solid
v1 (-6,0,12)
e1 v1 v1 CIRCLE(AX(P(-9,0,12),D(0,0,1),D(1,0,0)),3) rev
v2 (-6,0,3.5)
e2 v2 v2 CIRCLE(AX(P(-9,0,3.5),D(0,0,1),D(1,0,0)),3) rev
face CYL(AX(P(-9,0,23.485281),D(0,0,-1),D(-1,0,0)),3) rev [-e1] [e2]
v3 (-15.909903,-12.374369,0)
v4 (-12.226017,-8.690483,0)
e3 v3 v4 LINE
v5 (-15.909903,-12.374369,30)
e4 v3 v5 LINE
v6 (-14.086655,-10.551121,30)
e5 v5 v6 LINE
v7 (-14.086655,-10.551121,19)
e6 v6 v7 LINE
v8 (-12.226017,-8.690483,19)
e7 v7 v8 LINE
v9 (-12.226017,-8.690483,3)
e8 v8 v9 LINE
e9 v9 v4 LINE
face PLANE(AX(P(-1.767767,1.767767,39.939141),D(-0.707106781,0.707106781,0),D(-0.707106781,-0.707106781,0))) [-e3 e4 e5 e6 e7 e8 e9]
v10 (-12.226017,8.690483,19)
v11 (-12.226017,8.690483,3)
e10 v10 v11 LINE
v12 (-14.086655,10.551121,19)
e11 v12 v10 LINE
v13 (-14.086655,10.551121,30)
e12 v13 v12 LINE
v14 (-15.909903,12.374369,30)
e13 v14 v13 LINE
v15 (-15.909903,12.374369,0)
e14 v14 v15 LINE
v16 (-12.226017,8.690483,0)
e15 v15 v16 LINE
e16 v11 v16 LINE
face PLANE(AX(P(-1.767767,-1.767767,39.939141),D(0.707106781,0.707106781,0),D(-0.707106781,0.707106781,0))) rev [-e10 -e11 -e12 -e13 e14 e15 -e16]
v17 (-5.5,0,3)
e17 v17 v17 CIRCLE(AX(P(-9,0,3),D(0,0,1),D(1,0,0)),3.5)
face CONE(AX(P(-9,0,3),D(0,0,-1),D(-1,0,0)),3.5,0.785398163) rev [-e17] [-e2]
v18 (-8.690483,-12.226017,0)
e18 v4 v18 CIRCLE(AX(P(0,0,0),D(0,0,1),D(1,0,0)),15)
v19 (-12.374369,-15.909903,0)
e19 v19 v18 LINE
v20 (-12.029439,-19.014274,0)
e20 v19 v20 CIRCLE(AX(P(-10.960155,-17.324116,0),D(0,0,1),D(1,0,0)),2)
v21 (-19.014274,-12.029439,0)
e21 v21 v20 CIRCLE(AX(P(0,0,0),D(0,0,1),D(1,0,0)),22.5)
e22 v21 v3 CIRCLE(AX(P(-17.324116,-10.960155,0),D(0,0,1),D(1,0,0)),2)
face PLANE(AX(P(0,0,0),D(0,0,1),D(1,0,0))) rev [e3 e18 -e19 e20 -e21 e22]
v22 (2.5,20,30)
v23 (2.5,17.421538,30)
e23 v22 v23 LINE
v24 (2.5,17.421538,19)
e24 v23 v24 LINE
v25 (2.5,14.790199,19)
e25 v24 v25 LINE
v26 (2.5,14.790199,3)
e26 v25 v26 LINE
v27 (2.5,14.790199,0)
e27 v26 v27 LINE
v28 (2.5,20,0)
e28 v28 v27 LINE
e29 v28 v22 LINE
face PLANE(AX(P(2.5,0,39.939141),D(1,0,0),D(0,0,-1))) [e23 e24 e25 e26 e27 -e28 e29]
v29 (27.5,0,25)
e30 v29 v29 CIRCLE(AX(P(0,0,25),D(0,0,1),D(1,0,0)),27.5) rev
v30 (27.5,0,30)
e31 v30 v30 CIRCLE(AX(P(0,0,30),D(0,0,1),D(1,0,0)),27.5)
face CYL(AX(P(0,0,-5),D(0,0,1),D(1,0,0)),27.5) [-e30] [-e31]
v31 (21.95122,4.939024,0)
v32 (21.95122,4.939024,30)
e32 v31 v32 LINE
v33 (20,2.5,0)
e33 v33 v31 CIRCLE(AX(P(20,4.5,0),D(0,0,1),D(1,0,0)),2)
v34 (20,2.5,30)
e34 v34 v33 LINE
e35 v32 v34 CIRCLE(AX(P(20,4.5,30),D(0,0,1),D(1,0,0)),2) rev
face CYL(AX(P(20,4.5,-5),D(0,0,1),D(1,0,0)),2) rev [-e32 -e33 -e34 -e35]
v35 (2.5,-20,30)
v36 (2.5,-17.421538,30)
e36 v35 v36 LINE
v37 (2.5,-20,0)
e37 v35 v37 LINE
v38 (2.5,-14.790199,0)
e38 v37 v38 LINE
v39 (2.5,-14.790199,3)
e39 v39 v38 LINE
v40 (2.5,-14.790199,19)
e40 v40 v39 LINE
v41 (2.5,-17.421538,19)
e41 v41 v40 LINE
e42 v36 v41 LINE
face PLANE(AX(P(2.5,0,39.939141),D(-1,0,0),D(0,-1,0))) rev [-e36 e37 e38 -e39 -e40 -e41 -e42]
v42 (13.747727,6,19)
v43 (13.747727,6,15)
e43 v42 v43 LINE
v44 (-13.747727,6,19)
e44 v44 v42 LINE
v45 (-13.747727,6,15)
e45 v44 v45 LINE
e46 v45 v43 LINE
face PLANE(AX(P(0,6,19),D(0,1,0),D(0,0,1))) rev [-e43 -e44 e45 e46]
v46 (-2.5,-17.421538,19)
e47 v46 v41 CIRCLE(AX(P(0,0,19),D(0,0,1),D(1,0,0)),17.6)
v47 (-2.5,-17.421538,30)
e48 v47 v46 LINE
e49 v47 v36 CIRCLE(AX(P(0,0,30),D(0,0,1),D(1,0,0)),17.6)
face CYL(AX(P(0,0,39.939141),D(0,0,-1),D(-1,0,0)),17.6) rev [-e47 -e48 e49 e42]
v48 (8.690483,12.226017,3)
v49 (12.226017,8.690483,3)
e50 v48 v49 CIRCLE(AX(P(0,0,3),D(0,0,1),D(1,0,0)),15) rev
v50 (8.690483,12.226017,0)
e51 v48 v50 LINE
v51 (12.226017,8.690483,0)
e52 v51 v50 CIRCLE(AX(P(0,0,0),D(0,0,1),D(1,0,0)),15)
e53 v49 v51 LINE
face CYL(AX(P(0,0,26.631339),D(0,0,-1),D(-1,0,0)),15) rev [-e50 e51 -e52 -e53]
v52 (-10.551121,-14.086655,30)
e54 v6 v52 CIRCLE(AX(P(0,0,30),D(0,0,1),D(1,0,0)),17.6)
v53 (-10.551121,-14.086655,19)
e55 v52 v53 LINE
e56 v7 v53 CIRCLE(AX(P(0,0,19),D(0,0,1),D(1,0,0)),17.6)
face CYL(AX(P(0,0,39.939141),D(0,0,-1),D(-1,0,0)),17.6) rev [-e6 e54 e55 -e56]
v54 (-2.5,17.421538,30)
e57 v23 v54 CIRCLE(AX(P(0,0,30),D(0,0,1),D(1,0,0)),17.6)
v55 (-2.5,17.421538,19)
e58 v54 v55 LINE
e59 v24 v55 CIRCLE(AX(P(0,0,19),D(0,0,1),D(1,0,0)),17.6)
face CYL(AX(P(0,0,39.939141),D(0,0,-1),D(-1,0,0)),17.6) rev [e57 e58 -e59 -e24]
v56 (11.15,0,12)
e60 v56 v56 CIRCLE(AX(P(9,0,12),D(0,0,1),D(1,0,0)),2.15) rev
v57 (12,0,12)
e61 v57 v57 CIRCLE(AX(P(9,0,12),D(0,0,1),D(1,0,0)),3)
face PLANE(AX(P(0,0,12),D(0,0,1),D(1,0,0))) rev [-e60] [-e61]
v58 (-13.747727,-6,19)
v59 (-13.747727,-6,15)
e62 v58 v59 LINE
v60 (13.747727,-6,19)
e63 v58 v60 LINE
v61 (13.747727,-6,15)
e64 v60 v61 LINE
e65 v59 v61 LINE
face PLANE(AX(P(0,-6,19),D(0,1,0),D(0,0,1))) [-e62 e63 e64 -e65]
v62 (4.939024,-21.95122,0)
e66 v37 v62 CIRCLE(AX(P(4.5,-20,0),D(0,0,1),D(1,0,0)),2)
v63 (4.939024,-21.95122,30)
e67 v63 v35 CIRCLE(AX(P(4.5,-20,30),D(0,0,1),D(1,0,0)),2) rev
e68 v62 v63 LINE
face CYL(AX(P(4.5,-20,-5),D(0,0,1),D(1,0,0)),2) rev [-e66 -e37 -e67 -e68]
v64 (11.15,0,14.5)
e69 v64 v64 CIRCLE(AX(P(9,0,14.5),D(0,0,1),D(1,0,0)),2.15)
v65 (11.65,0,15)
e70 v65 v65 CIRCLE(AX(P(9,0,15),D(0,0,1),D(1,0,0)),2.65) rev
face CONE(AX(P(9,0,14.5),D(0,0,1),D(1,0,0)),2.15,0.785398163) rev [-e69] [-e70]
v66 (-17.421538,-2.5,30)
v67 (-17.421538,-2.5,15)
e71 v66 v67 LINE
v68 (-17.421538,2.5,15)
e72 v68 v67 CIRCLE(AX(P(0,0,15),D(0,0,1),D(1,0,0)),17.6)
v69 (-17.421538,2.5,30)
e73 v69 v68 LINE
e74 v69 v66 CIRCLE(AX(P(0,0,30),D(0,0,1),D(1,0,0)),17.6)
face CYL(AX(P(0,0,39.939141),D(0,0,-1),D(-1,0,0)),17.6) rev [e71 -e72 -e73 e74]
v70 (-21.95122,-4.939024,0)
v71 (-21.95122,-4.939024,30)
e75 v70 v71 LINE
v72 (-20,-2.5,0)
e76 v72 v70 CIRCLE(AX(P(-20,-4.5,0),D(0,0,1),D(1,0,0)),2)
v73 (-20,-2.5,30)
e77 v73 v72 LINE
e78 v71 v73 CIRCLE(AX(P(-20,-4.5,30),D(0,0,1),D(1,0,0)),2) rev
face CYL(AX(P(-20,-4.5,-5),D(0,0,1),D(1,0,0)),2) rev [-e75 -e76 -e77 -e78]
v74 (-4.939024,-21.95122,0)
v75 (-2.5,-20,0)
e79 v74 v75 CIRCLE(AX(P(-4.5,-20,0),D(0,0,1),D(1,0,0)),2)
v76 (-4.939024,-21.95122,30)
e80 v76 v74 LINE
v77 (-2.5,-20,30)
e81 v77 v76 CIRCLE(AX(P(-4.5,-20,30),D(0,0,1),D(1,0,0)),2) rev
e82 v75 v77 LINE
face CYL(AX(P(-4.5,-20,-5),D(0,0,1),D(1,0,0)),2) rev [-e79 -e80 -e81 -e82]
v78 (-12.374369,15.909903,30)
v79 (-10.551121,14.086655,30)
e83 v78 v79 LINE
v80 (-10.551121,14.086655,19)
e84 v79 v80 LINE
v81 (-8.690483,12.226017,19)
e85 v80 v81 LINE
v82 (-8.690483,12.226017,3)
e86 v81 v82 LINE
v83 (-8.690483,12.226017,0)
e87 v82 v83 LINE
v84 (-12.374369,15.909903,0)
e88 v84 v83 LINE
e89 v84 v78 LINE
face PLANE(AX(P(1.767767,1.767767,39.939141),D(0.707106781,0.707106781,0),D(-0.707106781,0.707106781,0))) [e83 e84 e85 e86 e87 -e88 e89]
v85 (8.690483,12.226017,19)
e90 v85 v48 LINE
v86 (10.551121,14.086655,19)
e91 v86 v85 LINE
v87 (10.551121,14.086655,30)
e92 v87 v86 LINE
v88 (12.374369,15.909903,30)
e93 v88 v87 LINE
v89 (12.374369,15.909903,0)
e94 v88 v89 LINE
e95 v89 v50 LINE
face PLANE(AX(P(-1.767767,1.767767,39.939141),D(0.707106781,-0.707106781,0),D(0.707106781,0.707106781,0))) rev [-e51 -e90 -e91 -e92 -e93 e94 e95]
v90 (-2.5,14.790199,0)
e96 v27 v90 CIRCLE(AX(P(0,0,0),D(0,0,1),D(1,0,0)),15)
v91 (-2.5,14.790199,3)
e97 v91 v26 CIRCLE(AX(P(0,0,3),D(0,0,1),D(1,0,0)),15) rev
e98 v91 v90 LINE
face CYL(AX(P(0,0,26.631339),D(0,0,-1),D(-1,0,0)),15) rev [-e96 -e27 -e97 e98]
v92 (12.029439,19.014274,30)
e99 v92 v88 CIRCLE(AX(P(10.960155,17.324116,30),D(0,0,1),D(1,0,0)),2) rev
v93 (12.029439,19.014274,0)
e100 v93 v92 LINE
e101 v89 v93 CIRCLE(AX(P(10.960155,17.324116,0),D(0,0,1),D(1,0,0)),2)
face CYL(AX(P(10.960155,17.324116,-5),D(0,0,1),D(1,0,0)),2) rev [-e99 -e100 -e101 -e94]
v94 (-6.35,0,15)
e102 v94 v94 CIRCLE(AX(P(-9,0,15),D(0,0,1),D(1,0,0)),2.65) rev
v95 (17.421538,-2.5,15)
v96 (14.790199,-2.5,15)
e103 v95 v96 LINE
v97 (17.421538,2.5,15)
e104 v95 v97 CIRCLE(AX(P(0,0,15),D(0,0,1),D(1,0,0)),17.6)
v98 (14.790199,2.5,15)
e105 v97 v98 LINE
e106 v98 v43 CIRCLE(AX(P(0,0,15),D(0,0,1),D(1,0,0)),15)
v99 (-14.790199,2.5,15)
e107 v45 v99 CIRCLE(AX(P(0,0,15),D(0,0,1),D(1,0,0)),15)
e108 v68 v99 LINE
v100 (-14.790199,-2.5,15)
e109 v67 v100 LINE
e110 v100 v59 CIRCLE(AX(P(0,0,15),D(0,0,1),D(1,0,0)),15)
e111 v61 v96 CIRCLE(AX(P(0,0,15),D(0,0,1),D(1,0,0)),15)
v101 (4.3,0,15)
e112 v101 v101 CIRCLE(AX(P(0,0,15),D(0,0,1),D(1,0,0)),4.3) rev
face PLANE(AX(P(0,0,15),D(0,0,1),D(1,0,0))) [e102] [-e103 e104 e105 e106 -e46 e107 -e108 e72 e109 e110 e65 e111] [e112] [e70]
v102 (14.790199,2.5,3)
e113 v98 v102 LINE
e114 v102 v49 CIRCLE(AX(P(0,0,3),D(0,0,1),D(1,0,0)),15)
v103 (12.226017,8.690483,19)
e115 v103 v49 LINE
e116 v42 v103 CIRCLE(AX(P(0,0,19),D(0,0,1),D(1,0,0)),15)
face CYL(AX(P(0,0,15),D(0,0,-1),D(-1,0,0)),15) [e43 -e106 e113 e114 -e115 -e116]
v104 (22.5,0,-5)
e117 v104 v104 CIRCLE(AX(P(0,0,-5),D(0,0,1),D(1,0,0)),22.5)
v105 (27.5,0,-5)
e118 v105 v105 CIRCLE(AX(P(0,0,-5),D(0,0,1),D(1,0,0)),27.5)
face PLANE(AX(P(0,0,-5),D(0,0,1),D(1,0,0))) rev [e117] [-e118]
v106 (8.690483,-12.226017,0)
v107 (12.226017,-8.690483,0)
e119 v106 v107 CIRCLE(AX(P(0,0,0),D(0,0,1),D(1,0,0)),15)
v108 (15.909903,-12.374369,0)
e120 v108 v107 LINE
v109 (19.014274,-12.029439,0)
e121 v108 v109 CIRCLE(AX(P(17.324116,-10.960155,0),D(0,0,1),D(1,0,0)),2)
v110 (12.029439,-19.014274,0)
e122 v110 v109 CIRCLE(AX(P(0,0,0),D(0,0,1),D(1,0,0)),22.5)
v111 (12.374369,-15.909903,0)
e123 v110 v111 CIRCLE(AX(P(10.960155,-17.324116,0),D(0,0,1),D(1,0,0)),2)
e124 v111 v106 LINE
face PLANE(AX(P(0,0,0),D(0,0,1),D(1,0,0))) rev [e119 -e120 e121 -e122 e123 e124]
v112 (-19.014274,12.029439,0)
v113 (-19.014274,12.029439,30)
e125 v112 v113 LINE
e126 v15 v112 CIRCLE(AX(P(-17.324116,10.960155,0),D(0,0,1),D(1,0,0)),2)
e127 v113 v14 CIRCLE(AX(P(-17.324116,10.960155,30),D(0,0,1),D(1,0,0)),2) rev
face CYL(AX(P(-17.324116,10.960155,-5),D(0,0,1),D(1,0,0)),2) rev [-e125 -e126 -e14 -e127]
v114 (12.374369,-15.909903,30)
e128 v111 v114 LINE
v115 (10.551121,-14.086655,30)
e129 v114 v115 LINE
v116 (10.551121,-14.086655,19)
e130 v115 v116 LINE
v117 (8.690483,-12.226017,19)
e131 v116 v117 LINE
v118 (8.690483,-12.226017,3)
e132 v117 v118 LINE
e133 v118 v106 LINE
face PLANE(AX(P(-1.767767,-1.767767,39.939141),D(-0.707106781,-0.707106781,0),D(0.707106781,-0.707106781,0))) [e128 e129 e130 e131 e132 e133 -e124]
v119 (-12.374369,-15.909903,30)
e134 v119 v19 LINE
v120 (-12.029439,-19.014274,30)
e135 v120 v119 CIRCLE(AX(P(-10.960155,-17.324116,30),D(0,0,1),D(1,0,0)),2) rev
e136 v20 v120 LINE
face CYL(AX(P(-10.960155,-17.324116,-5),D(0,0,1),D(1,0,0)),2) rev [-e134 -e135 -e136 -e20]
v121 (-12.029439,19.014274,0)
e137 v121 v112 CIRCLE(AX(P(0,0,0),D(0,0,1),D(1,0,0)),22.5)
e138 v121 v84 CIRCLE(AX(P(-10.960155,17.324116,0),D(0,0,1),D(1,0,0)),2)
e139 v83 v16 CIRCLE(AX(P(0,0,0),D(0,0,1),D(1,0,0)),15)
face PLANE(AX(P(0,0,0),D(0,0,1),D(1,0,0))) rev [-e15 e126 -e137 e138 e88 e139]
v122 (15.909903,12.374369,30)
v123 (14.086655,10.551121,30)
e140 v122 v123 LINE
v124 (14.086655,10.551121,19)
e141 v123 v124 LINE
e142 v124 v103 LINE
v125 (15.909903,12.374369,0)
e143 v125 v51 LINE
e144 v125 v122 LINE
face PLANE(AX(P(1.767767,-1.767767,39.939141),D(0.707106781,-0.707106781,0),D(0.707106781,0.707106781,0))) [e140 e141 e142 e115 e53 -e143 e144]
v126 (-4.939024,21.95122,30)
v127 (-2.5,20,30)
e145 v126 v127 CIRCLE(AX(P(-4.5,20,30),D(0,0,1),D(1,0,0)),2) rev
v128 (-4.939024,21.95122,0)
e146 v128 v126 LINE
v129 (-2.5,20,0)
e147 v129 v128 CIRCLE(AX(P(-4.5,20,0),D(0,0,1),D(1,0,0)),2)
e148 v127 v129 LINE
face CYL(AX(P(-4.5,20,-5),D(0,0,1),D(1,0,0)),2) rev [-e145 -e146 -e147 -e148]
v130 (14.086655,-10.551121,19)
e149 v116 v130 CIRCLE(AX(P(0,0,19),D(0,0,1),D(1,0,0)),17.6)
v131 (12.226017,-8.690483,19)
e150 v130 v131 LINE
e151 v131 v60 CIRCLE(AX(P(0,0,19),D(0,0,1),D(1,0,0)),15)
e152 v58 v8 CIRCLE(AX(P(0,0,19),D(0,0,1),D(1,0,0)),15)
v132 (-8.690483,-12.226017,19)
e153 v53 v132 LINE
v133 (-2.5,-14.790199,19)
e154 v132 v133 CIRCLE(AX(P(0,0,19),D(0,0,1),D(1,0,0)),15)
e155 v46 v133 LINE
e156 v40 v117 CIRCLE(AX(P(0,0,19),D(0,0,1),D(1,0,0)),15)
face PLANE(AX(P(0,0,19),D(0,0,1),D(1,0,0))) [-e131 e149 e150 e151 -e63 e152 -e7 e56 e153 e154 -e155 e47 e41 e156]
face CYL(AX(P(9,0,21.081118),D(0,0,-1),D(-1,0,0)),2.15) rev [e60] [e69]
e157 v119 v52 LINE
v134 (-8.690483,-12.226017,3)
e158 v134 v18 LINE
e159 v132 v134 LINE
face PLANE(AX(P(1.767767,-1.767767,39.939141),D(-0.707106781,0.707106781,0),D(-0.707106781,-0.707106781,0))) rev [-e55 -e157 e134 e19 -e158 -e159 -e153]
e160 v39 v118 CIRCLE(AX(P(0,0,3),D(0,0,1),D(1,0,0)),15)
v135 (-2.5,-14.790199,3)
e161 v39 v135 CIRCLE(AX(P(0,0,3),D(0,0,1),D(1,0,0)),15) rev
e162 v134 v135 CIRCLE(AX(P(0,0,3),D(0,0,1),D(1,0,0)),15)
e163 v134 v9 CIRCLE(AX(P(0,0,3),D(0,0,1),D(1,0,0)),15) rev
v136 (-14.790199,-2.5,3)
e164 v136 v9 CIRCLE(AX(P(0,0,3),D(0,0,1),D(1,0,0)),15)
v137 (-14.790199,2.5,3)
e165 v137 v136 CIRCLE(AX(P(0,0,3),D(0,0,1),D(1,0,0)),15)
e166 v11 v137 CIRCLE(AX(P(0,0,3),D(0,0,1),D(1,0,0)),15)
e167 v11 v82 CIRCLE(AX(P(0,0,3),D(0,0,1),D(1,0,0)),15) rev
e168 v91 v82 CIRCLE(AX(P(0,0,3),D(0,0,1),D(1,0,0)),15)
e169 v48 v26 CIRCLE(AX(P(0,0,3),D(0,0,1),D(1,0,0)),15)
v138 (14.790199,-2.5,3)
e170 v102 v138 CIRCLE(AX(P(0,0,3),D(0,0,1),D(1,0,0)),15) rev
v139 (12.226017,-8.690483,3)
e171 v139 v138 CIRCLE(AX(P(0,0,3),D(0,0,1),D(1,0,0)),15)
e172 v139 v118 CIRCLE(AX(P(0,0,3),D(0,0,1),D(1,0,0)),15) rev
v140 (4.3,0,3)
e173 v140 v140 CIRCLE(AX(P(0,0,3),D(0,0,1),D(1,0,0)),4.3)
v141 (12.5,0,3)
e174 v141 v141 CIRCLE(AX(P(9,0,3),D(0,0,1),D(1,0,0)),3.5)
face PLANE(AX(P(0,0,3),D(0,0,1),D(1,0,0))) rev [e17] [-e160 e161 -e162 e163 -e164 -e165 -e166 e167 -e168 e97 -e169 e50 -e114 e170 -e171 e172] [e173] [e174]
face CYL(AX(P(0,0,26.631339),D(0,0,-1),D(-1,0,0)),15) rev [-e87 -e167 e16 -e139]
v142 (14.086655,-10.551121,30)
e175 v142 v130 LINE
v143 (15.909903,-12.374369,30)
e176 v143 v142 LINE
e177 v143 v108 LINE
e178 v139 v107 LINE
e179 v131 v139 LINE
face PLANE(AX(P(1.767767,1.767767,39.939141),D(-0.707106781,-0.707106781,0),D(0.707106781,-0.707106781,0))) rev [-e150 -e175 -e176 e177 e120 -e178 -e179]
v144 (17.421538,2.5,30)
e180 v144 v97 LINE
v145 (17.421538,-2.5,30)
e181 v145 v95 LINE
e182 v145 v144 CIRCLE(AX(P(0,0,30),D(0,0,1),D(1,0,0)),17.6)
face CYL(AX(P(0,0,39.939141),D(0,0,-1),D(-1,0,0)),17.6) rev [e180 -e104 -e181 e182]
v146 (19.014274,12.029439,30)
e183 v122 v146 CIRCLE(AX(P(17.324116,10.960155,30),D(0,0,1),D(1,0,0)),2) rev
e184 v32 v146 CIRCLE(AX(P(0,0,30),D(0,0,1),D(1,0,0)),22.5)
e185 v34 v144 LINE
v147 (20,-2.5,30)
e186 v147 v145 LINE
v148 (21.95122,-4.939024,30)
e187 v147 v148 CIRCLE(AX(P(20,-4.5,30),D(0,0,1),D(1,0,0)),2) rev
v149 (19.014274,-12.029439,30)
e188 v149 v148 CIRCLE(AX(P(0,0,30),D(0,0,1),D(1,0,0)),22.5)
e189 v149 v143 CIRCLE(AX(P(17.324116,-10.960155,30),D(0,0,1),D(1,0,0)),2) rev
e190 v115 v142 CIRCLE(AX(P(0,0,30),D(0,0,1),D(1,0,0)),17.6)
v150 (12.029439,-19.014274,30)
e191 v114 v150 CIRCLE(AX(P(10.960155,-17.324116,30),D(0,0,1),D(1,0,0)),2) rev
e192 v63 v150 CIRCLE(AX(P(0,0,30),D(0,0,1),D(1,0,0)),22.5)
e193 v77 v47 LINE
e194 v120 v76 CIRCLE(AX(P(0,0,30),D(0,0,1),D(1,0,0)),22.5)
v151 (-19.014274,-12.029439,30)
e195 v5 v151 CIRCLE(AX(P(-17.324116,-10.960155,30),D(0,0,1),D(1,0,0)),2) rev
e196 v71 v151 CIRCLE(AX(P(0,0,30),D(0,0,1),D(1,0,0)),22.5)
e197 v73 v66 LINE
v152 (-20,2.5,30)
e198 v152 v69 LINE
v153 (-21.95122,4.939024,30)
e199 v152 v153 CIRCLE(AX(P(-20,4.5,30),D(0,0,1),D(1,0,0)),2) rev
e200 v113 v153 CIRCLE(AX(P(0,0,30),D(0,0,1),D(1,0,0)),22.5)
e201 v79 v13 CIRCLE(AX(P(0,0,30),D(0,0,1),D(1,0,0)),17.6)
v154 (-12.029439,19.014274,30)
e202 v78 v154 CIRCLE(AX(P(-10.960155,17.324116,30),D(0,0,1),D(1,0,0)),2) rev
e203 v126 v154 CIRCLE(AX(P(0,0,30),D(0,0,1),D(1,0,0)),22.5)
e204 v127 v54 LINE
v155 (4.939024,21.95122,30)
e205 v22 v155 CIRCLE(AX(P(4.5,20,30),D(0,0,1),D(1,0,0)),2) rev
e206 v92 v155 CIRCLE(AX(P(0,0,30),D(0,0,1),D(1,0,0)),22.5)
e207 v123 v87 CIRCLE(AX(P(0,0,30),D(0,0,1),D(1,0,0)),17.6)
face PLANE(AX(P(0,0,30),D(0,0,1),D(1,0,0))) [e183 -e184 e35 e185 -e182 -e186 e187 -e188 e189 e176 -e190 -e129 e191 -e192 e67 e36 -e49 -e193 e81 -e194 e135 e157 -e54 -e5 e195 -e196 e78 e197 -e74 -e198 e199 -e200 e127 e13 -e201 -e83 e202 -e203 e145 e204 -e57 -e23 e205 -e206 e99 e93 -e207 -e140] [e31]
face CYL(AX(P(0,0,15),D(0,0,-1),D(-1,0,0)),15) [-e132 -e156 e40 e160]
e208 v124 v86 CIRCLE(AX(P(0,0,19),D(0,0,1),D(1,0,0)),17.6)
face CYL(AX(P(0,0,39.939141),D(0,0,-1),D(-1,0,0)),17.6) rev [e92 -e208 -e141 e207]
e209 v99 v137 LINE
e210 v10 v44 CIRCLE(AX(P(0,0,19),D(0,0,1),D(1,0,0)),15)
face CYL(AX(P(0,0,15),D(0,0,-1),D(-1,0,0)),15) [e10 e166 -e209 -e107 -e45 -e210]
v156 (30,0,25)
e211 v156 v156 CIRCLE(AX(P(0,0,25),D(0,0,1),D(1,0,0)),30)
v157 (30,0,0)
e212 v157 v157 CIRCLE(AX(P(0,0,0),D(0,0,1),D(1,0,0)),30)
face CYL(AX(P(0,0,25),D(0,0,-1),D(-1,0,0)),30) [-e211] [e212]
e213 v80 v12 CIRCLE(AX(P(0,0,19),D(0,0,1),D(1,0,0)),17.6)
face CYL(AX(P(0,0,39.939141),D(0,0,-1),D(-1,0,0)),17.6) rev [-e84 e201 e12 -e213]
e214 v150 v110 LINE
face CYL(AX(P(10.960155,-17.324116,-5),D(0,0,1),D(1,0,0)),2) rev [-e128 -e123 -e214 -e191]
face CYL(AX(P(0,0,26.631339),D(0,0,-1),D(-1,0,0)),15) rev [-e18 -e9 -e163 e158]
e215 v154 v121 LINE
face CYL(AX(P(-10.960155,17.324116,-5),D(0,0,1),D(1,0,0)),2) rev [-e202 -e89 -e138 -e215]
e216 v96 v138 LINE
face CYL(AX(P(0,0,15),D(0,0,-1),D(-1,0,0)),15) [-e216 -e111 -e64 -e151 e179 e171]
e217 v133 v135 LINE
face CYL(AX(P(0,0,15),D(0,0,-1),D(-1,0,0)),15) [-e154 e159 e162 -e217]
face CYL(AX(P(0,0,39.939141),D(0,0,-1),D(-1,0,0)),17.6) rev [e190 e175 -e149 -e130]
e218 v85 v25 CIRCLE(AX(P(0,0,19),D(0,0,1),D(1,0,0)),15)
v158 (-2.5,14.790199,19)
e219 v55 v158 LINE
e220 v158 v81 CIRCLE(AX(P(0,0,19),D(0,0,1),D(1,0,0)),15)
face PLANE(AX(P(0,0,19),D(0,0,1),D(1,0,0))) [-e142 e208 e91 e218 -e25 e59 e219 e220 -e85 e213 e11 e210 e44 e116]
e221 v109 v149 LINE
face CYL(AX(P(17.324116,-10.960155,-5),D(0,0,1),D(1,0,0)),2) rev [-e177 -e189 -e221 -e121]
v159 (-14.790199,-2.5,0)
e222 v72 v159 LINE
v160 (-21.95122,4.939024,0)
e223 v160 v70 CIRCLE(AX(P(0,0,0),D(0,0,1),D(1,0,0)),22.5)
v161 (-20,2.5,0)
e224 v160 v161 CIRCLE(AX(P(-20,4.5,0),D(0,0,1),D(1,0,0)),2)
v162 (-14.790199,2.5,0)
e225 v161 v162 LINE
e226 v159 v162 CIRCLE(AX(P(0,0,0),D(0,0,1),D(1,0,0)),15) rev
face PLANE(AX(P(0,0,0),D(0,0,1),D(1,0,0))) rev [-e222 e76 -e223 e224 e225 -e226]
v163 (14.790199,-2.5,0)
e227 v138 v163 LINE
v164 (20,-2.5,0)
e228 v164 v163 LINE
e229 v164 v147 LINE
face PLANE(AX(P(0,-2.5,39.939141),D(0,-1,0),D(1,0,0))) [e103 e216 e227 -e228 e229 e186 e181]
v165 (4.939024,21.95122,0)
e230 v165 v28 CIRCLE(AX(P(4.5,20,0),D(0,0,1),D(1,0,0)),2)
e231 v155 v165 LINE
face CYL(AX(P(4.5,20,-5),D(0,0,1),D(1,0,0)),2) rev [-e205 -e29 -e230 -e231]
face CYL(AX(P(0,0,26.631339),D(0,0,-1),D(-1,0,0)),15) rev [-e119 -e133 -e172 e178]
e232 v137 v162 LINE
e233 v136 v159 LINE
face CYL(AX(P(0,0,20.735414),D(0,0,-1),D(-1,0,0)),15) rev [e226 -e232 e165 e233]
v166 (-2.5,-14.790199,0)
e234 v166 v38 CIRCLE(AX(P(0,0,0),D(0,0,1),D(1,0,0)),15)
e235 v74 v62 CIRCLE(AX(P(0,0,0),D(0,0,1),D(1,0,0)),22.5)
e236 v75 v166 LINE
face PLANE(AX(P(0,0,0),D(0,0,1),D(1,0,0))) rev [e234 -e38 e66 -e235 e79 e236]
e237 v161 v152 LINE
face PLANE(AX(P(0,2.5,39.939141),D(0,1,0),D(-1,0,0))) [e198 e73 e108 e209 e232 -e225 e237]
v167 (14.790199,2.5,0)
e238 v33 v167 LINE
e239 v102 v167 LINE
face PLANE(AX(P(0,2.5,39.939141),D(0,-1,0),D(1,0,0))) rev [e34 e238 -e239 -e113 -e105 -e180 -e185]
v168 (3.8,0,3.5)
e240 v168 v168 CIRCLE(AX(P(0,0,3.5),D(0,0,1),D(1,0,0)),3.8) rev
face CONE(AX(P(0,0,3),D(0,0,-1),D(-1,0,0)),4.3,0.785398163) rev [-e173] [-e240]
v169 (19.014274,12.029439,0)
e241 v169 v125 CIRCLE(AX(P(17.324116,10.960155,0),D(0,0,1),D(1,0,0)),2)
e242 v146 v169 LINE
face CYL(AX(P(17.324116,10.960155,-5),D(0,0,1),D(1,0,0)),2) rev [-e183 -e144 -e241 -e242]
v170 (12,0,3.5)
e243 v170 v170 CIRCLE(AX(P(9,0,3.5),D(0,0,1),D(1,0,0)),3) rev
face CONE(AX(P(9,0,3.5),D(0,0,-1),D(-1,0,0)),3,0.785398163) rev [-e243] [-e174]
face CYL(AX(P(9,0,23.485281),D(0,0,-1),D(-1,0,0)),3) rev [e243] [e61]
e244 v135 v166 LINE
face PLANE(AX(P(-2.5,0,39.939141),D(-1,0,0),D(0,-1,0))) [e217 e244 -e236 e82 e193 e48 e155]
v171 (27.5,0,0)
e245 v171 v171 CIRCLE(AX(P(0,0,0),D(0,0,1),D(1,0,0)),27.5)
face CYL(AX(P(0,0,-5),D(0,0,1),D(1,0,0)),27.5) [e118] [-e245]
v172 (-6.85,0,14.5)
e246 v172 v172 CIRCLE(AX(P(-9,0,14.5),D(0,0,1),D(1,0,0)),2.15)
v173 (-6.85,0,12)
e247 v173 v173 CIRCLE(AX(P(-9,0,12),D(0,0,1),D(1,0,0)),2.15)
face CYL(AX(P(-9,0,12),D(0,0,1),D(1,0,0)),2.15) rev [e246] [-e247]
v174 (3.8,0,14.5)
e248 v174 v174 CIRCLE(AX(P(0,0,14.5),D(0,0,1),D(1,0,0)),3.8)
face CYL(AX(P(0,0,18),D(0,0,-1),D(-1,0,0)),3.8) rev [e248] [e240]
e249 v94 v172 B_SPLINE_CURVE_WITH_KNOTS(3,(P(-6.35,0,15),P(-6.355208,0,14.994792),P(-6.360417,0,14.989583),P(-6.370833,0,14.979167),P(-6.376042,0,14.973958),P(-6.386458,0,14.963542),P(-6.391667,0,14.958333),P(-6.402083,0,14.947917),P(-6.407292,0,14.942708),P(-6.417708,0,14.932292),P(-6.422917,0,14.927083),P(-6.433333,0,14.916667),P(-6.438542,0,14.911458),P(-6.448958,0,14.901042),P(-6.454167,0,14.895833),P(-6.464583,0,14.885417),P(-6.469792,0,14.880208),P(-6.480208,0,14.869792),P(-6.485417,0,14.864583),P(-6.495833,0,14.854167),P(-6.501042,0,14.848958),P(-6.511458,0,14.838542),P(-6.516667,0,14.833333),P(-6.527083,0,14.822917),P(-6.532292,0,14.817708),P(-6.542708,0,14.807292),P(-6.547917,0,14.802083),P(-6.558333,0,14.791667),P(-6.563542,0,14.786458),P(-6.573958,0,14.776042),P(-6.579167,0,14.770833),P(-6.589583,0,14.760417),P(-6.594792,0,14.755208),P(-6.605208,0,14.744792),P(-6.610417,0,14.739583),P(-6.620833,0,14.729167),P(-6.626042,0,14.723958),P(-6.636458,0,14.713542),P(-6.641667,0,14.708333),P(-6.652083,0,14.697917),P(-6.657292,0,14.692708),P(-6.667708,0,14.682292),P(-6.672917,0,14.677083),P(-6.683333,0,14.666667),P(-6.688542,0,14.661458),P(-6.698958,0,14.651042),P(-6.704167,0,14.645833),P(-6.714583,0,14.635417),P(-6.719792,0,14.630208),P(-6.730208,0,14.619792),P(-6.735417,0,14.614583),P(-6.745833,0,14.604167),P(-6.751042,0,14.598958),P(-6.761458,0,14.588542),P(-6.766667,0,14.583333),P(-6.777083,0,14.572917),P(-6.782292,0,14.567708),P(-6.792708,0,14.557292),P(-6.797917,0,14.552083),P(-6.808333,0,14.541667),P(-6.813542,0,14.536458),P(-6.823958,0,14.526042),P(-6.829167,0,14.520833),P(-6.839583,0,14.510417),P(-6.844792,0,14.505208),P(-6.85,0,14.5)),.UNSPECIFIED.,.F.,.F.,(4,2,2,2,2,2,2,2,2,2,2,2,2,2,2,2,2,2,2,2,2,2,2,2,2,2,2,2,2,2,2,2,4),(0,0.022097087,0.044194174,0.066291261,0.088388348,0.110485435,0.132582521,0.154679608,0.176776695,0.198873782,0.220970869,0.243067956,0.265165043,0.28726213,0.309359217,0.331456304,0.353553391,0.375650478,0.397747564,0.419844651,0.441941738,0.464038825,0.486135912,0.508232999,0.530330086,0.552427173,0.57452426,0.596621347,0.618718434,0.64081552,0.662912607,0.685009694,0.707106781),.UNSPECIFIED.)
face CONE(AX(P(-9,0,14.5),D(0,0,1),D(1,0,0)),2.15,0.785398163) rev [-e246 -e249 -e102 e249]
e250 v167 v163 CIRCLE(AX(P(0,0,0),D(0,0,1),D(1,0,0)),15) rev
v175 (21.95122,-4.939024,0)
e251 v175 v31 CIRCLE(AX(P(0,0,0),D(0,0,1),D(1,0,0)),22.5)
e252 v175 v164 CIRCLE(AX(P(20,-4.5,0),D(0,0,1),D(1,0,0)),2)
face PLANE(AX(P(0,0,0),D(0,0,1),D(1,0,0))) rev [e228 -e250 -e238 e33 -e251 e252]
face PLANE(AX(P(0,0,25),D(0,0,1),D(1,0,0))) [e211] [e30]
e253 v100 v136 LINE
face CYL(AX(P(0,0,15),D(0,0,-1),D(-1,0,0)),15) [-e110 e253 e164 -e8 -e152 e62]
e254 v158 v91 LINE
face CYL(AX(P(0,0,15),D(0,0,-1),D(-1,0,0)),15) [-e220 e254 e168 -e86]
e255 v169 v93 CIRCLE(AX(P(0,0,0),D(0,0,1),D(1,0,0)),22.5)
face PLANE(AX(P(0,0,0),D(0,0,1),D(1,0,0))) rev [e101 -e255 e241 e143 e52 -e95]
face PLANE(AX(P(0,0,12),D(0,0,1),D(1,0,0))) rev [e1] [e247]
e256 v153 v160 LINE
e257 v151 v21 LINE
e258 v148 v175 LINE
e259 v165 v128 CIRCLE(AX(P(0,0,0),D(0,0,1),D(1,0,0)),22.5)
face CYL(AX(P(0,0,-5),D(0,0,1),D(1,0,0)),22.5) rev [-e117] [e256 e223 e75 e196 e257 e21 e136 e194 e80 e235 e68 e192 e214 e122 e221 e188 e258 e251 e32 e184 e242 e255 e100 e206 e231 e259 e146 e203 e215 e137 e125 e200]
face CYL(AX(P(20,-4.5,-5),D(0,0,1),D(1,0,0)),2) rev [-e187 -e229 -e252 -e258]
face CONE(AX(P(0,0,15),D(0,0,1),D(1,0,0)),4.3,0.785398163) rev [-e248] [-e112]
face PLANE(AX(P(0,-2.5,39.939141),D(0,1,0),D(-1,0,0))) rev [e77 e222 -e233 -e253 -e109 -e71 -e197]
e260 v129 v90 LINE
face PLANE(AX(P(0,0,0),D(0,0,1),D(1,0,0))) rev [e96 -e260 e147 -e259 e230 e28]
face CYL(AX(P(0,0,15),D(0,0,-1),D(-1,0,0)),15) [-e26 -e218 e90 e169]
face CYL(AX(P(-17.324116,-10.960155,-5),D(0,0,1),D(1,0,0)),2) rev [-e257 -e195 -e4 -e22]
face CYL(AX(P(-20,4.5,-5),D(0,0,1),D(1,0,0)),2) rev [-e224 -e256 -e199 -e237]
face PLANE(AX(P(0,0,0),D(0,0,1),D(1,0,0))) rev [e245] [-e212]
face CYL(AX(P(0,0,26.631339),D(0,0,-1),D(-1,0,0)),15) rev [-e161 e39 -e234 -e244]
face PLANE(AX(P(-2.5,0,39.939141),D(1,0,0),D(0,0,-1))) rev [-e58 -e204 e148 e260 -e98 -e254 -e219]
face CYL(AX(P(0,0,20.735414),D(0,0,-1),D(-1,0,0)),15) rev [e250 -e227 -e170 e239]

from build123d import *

# Parameters (mm, degrees)
BOSS_EXTRUDE7_START       = 3
SKETCH1_15_R              = 15
BOSS_EXTRUDE7_DEPTH       = 12
CUT_EXTRUDE2_START        = 3
SKETCH1_16_R              = 3.8
CUT_EXTRUDE2_DEPTH        = 15
SKETCH1_18_R              = 3
CUT_EXTRUDE4_DEPTH        = 12
CUT_EXTRUDE5_START        = 15
SKETCH1_19_R              = 2.15
CUT_EXTRUDE5_DEPTH        = 3
SKETCH1_R                 = 2.15
CUT_EXTRUDE6_DEPTH        = 15
BOSS_EXTRUDE12_START      = 15
BOSS_EXTRUDE12_DEPTH      = 4
BOSS_EXTRUDE13_DEPTH      = 30
BOSS_EXTRUDE13_DEPTH_BACK = 5
SKETCH1_23_R              = 27.5
SKETCH1_23_R_2            = 22.5
BOSS_EXTRUDE14_DEPTH      = 30
BOSS_EXTRUDE16_DEPTH      = 15
SKETCH1_28_R              = 30
SKETCH1_28_R_2            = 27.5
BOSS_EXTRUDE18_DEPTH      = 25
BOSS_EXTRUDE19_DEPTH      = 23
BOSS_EXTRUDE19_DEPTH_BACK = 5
BOSS_EXTRUDE19_START      = 5
CHAMFER5_SIZE             = 0.5
FILLET1_R                 = 2
BOSS_EXTRUDE20_DEPTH      = 19


# Read off the part's stored shape, not the designer's step: Boss-Extrude16
with BuildPart() as part:
    # Sketch1<15> → Boss-Extrude7 (new body)
    with BuildSketch(Plane.XY.offset(BOSS_EXTRUDE7_START)):
        Circle(SKETCH1_15_R)
    extrude(amount=BOSS_EXTRUDE7_DEPTH)

    # Sketch1<16> → Cut-Extrude2 (cut)
    with BuildSketch(Plane.XY.offset(CUT_EXTRUDE2_START)):
        Circle(SKETCH1_16_R)
    extrude(amount=CUT_EXTRUDE2_DEPTH, mode=Mode.SUBTRACT)

    # Sketch1<18> → Cut-Extrude4 (cut)
    with BuildSketch(Plane.XY):
        with Locations((9, 0)):
            Circle(SKETCH1_18_R)
        with Locations((-9, 0)):
            Circle(SKETCH1_18_R)
    extrude(amount=CUT_EXTRUDE4_DEPTH, mode=Mode.SUBTRACT)

    # Sketch1<19> → Cut-Extrude5 (cut)
    with BuildSketch(Plane.XY.offset(CUT_EXTRUDE5_START)):
        with Locations((-9, 0)):
            Circle(SKETCH1_19_R)
    extrude(amount=-CUT_EXTRUDE5_DEPTH, mode=Mode.SUBTRACT)

    # Sketch1 → Cut-Extrude6 (cut)
    with BuildSketch(Plane.XY):
        with Locations((9, 0)):
            Circle(SKETCH1_R)
    extrude(amount=CUT_EXTRUDE6_DEPTH, mode=Mode.SUBTRACT)

    # Sketch1<22> → Boss-Extrude12 (add)
    with BuildSketch(Plane.XY.offset(BOSS_EXTRUDE12_START)):
        with BuildLine():
            ThreePointArc((8.690483379, 12.226017285), (5.740251485, 13.858192988), (2.5, 14.790199458))
            ThreePointArc((2.5, 14.790199458), (0, 15), (-2.5, 14.790199458))
            ThreePointArc((-2.5, 14.790199458), (-5.740251485, 13.858192988), (-8.690483379, 12.226017285))
            ThreePointArc((-8.690483379, 12.226017285), (-10.606601718, 10.606601718), (-12.226017285, 8.690483379))
            ThreePointArc((-12.226017285, 8.690483379), (-13.056359536, 7.384543023), (-13.747727085, 6))
            Line((-13.747727085, 6), (13.747727085, 6))
            ThreePointArc((13.747727085, 6), (13.056359536, 7.384543023), (12.226017285, 8.690483379))
            ThreePointArc((12.226017285, 8.690483379), (10.606601718, 10.606601718), (8.690483379, 12.226017285))
        make_face()
        with BuildLine():
            ThreePointArc((12.226017285, -8.690483379), (13.056359536, -7.384543023), (13.747727085, -6))
            Line((13.747727085, -6), (-13.747727085, -6))
            ThreePointArc((-13.747727085, -6), (-13.056359536, -7.384543023), (-12.226017285, -8.690483379))
            ThreePointArc((-12.226017285, -8.690483379), (-10.606601718, -10.606601718), (-8.690483379, -12.226017285))
            ThreePointArc((-8.690483379, -12.226017285), (-5.740251485, -13.858192988), (-2.5, -14.790199458))
            ThreePointArc((-2.5, -14.790199458), (0, -15), (2.5, -14.790199458))
            ThreePointArc((2.5, -14.790199458), (5.740251485, -13.858192988), (8.690483379, -12.226017285))
            ThreePointArc((8.690483379, -12.226017285), (10.606601718, -10.606601718), (12.226017285, -8.690483379))
        make_face()
    extrude(amount=BOSS_EXTRUDE12_DEPTH)

    # Boss-Extrude16 outline → Boss-Extrude16 (add)
    with BuildSketch(Plane.XY):
        with BuildLine():
            ThreePointArc((-14.790199458, -2.5), (-15, 0), (-14.790199458, 2.5))
            Line((-14.790199458, 2.5), (-17.421538394, 2.5))
            ThreePointArc((-17.421538394, 2.5), (-17.6, 0), (-17.421538394, -2.5))
            Line((-17.421538394, -2.5), (-14.790199458, -2.5))
        make_face()
        with BuildLine():
            Line((17.421538394, 2.5), (14.790199458, 2.5))
            ThreePointArc((14.790199458, 2.5), (15, 0), (14.790199458, -2.5))
            Line((14.790199458, -2.5), (17.421538394, -2.5))
            ThreePointArc((17.421538394, -2.5), (17.6, 0), (17.421538394, 2.5))
        make_face()
    extrude(amount=BOSS_EXTRUDE16_DEPTH)


with BuildPart() as body_2:
    # Sketch1<23> → Boss-Extrude13 (new, two sides: drawn at the far end of the back side and taken through both)
    with BuildSketch(Plane.XY.offset(-BOSS_EXTRUDE13_DEPTH_BACK)):
        Circle(SKETCH1_23_R)
        Circle(SKETCH1_23_R_2, mode=Mode.SUBTRACT)
    extrude(amount=BOSS_EXTRUDE13_DEPTH + BOSS_EXTRUDE13_DEPTH_BACK)

    # Sketch1<24> → Boss-Extrude14 (add)
    with BuildSketch(Plane.XY):
        with BuildLine():
            Line((2.5, 17.421538394), (2.5, 22.360679775))
            ThreePointArc((2.5, 22.360679775), (0, 22.5), (-2.5, 22.360679775))
            Line((-2.5, 22.360679775), (-2.5, 17.421538394))
            ThreePointArc((-2.5, 17.421538394), (0, 17.6), (2.5, 17.421538394))
        make_face()
        with BuildLine():
            ThreePointArc((17.579155254, 14.043621348), (15.909902577, 15.909902577), (14.043621348, 17.579155254))
            Line((14.043621348, 17.579155254), (10.551120984, 14.08665489))
            ThreePointArc((10.551120984, 14.08665489), (12.445079349, 12.445079349), (14.08665489, 10.551120984))
            Line((14.08665489, 10.551120984), (17.579155254, 14.043621348))
        make_face()
        with BuildLine():
            Line((-10.551120984, 14.08665489), (-14.043621348, 17.579155254))
            ThreePointArc((-14.043621348, 17.579155254), (-15.909902577, 15.909902577), (-17.579155254, 14.043621348))
            Line((-17.579155254, 14.043621348), (-14.08665489, 10.551120984))
            ThreePointArc((-14.08665489, 10.551120984), (-12.445079349, 12.445079349), (-10.551120984, 14.08665489))
        make_face()
        with BuildLine():
            ThreePointArc((22.360679775, -2.5), (22.5, 0), (22.360679775, 2.5))
            Line((22.360679775, 2.5), (17.421538394, 2.5))
            ThreePointArc((17.421538394, 2.5), (17.6, 0), (17.421538394, -2.5))
            Line((17.421538394, -2.5), (22.360679775, -2.5))
        make_face()
        with BuildLine():
            Line((-17.421538394, 2.5), (-22.360679775, 2.5))
            ThreePointArc((-22.360679775, 2.5), (-22.5, 0), (-22.360679775, -2.5))
            Line((-22.360679775, -2.5), (-17.421538394, -2.5))
            ThreePointArc((-17.421538394, -2.5), (-17.6, 0), (-17.421538394, 2.5))
        make_face()
        with BuildLine():
            ThreePointArc((14.043621348, -17.579155254), (15.909902577, -15.909902577), (17.579155254, -14.043621348))
            Line((17.579155254, -14.043621348), (14.08665489, -10.551120984))
            ThreePointArc((14.08665489, -10.551120984), (12.445079349, -12.445079349), (10.551120984, -14.08665489))
            Line((10.551120984, -14.08665489), (14.043621348, -17.579155254))
        make_face()
        with BuildLine():
            Line((-14.08665489, -10.551120984), (-17.579155254, -14.043621348))
            ThreePointArc((-17.579155254, -14.043621348), (-15.909902577, -15.909902577), (-14.043621348, -17.579155254))
            Line((-14.043621348, -17.579155254), (-10.551120984, -14.08665489))
            ThreePointArc((-10.551120984, -14.08665489), (-12.445079349, -12.445079349), (-14.08665489, -10.551120984))
        make_face()
        with BuildLine():
            ThreePointArc((-2.5, -22.360679775), (0, -22.5), (2.5, -22.360679775))
            Line((2.5, -22.360679775), (2.5, -17.421538394))
            ThreePointArc((2.5, -17.421538394), (0, -17.6), (-2.5, -17.421538394))
            Line((-2.5, -17.421538394), (-2.5, -22.360679775))
        make_face()
    extrude(amount=BOSS_EXTRUDE14_DEPTH)


    add(part.part)  # Boss-Extrude19 merges part


with BuildPart() as body_3:
    # Sketch1<28> → Boss-Extrude18 (new body)
    with BuildSketch(Plane.XY):
        Circle(SKETCH1_28_R)
        Circle(SKETCH1_28_R_2, mode=Mode.SUBTRACT)
    extrude(amount=BOSS_EXTRUDE18_DEPTH)


with BuildPart() as body_2_1:
    add(body_2.part)

    add(body_3.part)  # Boss-Extrude19 merges body 3
    # Sketch1<32> → Boss-Extrude19 (add, two sides: drawn at the far end of the back side and taken through both)
    with BuildSketch(Plane.XY.offset(BOSS_EXTRUDE19_START - BOSS_EXTRUDE19_DEPTH_BACK)):
        with BuildLine():
            ThreePointArc((14.043621348, -17.579155254), (15.909902577, -15.909902577), (17.579155254, -14.043621348))
            Line((17.579155254, -14.043621348), (14.08665489, -10.551120984))
            ThreePointArc((14.08665489, -10.551120984), (12.445079349, -12.445079349), (10.551120984, -14.08665489))
            Line((10.551120984, -14.08665489), (14.043621348, -17.579155254))
        make_face()
        with BuildLine():
            ThreePointArc((22.5, 0), (22.465142943, 1.251939508), (22.360679775, 2.5))
            Line((22.360679775, 2.5), (17.421538394, 2.5))
            ThreePointArc((17.421538394, 2.5), (17.555327905, 1.253180807), (17.6, 0))
            ThreePointArc((17.6, 0), (17.555327905, -1.253180807), (17.421538394, -2.5))
            Line((17.421538394, -2.5), (22.360679775, -2.5))
            ThreePointArc((22.360679775, -2.5), (22.465142943, -1.251939508), (22.5, 0))
        make_face()
        with BuildLine():
            ThreePointArc((17.579155254, 14.043621348), (15.909902577, 15.909902577), (14.043621348, 17.579155254))
            Line((14.043621348, 17.579155254), (10.551120984, 14.08665489))
            ThreePointArc((10.551120984, 14.08665489), (12.445079349, 12.445079349), (14.08665489, 10.551120984))
            Line((14.08665489, 10.551120984), (17.579155254, 14.043621348))
        make_face()
        with BuildLine():
            Line((2.5, 17.421538394), (2.5, 22.360679775))
            ThreePointArc((2.5, 22.360679775), (0, 22.5), (-2.5, 22.360679775))
            Line((-2.5, 22.360679775), (-2.5, 17.421538394))
            ThreePointArc((-2.5, 17.421538394), (0, 17.6), (2.5, 17.421538394))
        make_face()
        with BuildLine():
            Line((-10.551120984, 14.08665489), (-14.043621348, 17.579155254))
            ThreePointArc((-14.043621348, 17.579155254), (-15.909902577, 15.909902577), (-17.579155254, 14.043621348))
            Line((-17.579155254, 14.043621348), (-14.08665489, 10.551120984))
            ThreePointArc((-14.08665489, 10.551120984), (-12.445079349, 12.445079349), (-10.551120984, 14.08665489))
        make_face()
        with BuildLine():
            Line((-17.421538394, 2.5), (-22.360679775, 2.5))
            ThreePointArc((-22.360679775, 2.5), (-22.5, 0), (-22.360679775, -2.5))
            Line((-22.360679775, -2.5), (-17.421538394, -2.5))
            ThreePointArc((-17.421538394, -2.5), (-17.6, 0), (-17.421538394, 2.5))
        make_face()
        with BuildLine():
            Line((-14.08665489, -10.551120984), (-17.579155254, -14.043621348))
            ThreePointArc((-17.579155254, -14.043621348), (-15.909902577, -15.909902577), (-14.043621348, -17.579155254))
            Line((-14.043621348, -17.579155254), (-10.551120984, -14.08665489))
            ThreePointArc((-10.551120984, -14.08665489), (-12.445079349, -12.445079349), (-14.08665489, -10.551120984))
        make_face()
        with BuildLine():
            ThreePointArc((-2.5, -22.360679775), (0, -22.5), (2.5, -22.360679775))
            Line((2.5, -22.360679775), (2.5, -17.421538394))
            ThreePointArc((2.5, -17.421538394), (0, -17.6), (-2.5, -17.421538394))
            Line((-2.5, -17.421538394), (-2.5, -22.360679775))
        make_face()
    extrude(amount=BOSS_EXTRUDE19_DEPTH + BOSS_EXTRUDE19_DEPTH_BACK)

    # Chamfer5
    chamfer5_edges = [body_2_1.edges().sort_by_distance(p)[0] for p in [
        (-3.8, 0, 3),
        (-12, 0, 3),
        (-3.8, 0, 15),
        (6, 0, 3),
        (-11.15, 0, 15),
        (6.85, 0, 15),
    ]]
    chamfer(chamfer5_edges, length=CHAMFER5_SIZE)

    # Fillet1
    fillet1_edges = [body_2_1.edges().sort_by_distance(p)[0] for p in [
        (-17.579155254, -14.043621348, 15),
        (-14.043621348, -17.579155254, 15),
        (-22.360679775, 2.5, 15),
        (-22.360679775, -2.5, 15),
        (-14.043621348, 17.579155254, 15),
        (-17.579155254, 14.043621348, 15),
        (2.5, 22.360679775, 15),
        (-2.5, 22.360679775, 15),
        (17.579155254, 14.043621348, 15),
        (14.043621348, 17.579155254, 15),
        (22.360679775, -2.5, 15),
        (22.360679775, 2.5, 15),
        (14.043621348, -17.579155254, 15),
        (17.579155254, -14.043621348, 15),
        (-2.5, -22.360679775, 15),
        (2.5, -22.360679775, 15),
    ]]
    fillet(fillet1_edges, radius=FILLET1_R)

    # Sketch1<33> → Boss-Extrude20 (add)
    with BuildSketch(Plane.XY):
        with BuildLine():
            Line((2.5, 14.790199458), (2.5, 17.421538394))
            ThreePointArc((2.5, 17.421538394), (0, 17.6), (-2.5, 17.421538394))
            Line((-2.5, 17.421538394), (-2.5, 14.790199458))
            ThreePointArc((-2.5, 14.790199458), (0, 15), (2.5, 14.790199458))
        make_face()
        with BuildLine():
            Line((-8.690483379, 12.226017285), (-10.551120984, 14.08665489))
            ThreePointArc((-10.551120984, 14.08665489), (-12.445079349, 12.445079349), (-14.08665489, 10.551120984))
            Line((-14.08665489, 10.551120984), (-12.226017285, 8.690483379))
            ThreePointArc((-12.226017285, 8.690483379), (-10.606601718, 10.606601718), (-8.690483379, 12.226017285))
        make_face()
        with BuildLine():
            Line((-12.226017285, -8.690483379), (-14.08665489, -10.551120984))
            ThreePointArc((-14.08665489, -10.551120984), (-12.445079349, -12.445079349), (-10.551120984, -14.08665489))
            Line((-10.551120984, -14.08665489), (-8.690483379, -12.226017285))
            ThreePointArc((-8.690483379, -12.226017285), (-10.606601718, -10.606601718), (-12.226017285, -8.690483379))
        make_face()
        with BuildLine():
            ThreePointArc((-2.5, -17.421538394), (0, -17.6), (2.5, -17.421538394))
            Line((2.5, -17.421538394), (2.5, -14.790199458))
            ThreePointArc((2.5, -14.790199458), (0, -15), (-2.5, -14.790199458))
            Line((-2.5, -14.790199458), (-2.5, -17.421538394))
        make_face()
        with BuildLine():
            ThreePointArc((10.551120984, -14.08665489), (12.445079349, -12.445079349), (14.08665489, -10.551120984))
            Line((14.08665489, -10.551120984), (12.226017285, -8.690483379))
            ThreePointArc((12.226017285, -8.690483379), (10.606601718, -10.606601718), (8.690483379, -12.226017285))
            Line((8.690483379, -12.226017285), (10.551120984, -14.08665489))
        make_face()
        with BuildLine():
            ThreePointArc((14.08665489, 10.551120984), (12.445079349, 12.445079349), (10.551120984, 14.08665489))
            Line((10.551120984, 14.08665489), (8.690483379, 12.226017285))
            ThreePointArc((8.690483379, 12.226017285), (10.606601718, 10.606601718), (12.226017285, 8.690483379))
            Line((12.226017285, 8.690483379), (14.08665489, 10.551120984))
        make_face()
    extrude(amount=BOSS_EXTRUDE20_DEPTH)


solid = body_2_1.part
